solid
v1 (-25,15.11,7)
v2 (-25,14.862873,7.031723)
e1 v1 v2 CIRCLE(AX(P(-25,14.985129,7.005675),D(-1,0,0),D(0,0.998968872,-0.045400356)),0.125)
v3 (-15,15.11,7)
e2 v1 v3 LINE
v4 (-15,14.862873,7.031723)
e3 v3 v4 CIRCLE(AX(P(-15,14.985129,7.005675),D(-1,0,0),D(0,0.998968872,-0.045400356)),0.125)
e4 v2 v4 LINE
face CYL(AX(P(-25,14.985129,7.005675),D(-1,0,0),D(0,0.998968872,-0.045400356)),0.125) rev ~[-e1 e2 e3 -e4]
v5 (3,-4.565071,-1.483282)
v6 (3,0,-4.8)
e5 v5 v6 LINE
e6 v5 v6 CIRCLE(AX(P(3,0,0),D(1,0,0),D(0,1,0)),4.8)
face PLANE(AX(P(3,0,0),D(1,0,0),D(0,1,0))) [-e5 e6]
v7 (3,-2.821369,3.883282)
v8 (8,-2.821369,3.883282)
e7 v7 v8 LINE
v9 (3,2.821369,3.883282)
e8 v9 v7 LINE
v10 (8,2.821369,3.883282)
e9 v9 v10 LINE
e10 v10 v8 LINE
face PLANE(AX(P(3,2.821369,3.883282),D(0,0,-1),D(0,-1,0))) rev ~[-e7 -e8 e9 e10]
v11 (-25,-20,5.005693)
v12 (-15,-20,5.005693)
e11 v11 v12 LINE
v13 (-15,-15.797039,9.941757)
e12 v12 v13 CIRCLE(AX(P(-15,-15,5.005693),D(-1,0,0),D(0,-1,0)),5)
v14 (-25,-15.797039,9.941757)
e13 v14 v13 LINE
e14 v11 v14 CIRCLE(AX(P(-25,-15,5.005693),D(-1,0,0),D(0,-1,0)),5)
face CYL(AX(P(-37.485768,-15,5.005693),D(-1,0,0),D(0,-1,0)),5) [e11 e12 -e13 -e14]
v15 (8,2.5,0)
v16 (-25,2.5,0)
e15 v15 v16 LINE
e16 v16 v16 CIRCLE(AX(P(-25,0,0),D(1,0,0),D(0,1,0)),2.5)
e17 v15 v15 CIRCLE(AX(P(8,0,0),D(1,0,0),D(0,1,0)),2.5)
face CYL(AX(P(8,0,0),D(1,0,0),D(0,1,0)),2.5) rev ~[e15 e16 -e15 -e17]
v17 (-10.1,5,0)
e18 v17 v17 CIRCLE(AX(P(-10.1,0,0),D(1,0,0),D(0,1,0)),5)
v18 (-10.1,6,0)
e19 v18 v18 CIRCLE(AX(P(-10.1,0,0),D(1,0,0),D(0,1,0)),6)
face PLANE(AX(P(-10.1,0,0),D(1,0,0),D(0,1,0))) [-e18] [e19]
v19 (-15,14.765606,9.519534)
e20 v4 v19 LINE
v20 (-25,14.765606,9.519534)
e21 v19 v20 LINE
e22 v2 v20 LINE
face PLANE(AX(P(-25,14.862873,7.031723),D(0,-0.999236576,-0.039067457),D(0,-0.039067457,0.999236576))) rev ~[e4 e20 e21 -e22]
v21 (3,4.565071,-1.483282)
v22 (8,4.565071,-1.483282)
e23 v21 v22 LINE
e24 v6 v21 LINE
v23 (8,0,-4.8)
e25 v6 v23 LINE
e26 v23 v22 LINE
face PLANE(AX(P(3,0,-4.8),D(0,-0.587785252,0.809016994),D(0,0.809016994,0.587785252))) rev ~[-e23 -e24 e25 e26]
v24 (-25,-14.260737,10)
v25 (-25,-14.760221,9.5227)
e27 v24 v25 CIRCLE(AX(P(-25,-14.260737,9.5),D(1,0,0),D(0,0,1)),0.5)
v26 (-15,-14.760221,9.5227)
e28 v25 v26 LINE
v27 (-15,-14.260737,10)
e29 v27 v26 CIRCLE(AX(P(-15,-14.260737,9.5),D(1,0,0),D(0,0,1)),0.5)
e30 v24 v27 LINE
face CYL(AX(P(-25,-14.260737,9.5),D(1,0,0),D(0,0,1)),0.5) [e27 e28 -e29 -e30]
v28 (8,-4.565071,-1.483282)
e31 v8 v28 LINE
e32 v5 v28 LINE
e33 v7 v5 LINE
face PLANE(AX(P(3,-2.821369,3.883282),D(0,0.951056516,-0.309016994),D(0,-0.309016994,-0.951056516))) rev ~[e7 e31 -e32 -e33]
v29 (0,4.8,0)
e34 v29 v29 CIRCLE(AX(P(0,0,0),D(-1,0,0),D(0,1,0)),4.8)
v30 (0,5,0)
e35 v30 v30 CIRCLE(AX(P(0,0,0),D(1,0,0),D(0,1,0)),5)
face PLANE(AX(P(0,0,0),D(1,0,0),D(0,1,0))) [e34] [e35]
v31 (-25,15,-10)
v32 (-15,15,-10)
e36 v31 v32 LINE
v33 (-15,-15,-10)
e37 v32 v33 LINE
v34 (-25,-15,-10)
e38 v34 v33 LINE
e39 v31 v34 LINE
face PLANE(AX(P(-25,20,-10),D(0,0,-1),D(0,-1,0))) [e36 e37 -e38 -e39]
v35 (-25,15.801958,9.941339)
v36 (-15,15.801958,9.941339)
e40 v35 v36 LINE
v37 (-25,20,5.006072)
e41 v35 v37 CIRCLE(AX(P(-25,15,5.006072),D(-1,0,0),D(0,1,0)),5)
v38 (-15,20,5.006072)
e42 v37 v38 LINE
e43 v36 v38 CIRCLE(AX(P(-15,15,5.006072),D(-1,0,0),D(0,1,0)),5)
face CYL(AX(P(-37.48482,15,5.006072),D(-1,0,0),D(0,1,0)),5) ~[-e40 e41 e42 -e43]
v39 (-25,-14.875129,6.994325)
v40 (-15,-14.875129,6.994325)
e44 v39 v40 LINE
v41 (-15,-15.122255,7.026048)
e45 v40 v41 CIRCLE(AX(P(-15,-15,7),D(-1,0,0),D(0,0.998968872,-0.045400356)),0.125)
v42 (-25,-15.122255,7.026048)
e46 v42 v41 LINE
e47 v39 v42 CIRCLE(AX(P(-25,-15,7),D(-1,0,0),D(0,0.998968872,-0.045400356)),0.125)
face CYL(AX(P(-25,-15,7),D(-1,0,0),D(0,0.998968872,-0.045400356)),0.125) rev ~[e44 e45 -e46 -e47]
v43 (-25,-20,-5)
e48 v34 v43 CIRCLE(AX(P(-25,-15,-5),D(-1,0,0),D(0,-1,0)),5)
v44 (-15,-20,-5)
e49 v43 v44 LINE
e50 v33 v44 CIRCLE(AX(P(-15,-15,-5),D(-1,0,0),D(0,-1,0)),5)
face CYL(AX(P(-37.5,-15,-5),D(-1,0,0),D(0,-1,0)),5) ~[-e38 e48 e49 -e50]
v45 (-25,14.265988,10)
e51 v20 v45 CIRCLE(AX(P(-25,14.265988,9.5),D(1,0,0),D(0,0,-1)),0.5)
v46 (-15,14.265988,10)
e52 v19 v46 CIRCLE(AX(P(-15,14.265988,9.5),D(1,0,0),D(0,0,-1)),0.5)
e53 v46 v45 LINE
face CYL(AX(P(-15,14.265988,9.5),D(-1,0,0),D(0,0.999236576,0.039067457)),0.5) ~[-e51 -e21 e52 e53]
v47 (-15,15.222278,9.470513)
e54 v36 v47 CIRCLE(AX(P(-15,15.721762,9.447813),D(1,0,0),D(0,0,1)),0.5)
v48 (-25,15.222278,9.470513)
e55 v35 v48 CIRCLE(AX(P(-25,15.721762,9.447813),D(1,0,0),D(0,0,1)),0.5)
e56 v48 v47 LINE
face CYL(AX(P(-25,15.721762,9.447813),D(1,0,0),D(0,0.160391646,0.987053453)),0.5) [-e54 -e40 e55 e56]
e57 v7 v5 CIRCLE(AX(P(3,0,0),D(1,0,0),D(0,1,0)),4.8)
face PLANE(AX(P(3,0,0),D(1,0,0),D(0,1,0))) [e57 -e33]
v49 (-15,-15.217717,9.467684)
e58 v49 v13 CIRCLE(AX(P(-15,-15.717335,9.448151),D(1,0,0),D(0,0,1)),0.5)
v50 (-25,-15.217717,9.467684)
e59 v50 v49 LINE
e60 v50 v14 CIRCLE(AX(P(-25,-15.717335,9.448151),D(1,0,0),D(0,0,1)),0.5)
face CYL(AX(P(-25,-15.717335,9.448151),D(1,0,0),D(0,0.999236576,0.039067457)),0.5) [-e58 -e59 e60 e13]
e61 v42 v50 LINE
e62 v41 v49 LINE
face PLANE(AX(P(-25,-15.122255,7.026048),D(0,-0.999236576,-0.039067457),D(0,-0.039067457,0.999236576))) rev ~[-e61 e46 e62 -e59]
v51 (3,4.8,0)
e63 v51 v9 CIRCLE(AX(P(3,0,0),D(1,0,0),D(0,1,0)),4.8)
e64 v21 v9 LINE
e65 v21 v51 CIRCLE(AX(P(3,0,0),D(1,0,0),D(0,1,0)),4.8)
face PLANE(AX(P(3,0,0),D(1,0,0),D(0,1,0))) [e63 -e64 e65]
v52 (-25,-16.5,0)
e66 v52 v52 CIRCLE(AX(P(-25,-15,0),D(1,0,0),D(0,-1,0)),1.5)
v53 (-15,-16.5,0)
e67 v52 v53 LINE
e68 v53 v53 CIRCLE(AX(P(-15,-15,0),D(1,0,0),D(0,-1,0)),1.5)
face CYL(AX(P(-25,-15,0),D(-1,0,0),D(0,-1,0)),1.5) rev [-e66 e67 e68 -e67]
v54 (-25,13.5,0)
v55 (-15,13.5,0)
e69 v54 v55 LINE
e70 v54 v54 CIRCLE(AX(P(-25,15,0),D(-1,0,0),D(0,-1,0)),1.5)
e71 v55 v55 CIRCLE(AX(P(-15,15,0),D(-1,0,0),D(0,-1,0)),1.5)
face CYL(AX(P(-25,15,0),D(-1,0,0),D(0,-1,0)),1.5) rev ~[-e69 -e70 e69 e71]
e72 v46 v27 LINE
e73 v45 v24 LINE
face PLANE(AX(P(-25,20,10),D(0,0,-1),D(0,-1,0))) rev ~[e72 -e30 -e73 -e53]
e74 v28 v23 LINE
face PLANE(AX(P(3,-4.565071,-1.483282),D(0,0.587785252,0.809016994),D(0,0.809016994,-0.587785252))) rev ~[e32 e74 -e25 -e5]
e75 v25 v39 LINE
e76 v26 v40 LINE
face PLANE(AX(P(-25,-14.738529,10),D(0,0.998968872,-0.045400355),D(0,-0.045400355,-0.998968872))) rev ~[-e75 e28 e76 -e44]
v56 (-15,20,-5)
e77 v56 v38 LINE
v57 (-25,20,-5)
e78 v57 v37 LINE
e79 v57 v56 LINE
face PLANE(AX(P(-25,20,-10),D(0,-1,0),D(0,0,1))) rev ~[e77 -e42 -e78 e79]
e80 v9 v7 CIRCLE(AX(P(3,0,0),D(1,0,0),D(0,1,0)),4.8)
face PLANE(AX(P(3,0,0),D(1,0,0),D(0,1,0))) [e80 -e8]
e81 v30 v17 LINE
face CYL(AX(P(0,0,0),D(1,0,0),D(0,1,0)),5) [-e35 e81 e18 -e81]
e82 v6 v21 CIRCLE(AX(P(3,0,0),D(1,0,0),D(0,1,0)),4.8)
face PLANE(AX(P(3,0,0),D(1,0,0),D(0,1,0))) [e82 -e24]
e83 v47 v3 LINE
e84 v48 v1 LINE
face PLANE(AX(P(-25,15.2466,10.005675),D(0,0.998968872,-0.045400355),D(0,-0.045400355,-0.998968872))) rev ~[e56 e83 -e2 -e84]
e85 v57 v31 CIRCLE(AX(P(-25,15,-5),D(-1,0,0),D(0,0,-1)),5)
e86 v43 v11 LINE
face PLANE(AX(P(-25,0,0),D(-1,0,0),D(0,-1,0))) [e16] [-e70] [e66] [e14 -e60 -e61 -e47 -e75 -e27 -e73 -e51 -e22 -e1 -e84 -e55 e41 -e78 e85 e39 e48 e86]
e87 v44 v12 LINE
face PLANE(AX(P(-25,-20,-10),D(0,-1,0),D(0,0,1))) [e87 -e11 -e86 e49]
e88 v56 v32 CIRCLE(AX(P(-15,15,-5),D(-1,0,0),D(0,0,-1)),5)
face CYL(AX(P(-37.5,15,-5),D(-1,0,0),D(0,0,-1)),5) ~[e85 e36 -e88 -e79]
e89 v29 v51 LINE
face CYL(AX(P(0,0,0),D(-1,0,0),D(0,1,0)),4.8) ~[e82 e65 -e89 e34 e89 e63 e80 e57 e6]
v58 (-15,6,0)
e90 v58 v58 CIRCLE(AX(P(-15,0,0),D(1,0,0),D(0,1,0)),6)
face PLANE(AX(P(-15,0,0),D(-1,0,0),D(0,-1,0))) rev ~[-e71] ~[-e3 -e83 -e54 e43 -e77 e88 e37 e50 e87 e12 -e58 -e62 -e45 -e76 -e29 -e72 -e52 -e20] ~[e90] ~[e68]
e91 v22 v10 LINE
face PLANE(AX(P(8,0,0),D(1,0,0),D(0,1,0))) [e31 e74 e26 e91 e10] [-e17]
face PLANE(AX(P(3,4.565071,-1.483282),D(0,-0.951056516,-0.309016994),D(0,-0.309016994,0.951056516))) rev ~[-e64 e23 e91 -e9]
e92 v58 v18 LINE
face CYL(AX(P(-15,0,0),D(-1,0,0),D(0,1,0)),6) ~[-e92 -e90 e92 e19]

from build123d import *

# Parameters (mm, degrees)
F0_R          = 5
F1_DEPTH      = 25
F2_R          = 4.8
F3_DEPTH      = 3
F5_DEPTH      = 5
F5_DEPTH_BACK = 23
F6_W          = 40
F6_H          = 20
F6_R          = 1.5
F7_DEPTH      = 10
F9_DEPTH      = 10
F10_T1_DEPTH  = 34.9696394511
F10_T3_DEPTH  = 35
F10_T5_DEPTH  = 34.9715357564
F11_R         = 0.5
F12_R         = 6
F13_DEPTH     = 4.9
F14_R         = 2.5
F15_DEPTH     = 65


# Not quite as in the source:
# - a fillet or chamfer that OpenCascade refuses, or shapes differently, is made with other operations: its cross-section is extruded or revolved along the edge and cut away or added
# - a feature names something its author has since deleted; it is built from what else it names


with BuildPart() as f1:
    # F0 (on Right) → F1 (new body)
    with BuildSketch(Plane.YZ):
        Circle(F0_R)
    extrude(amount=-F1_DEPTH)

    # F2 (on face) → F3 (join)
    with BuildSketch(Plane.YZ):
        Circle(F2_R)
    extrude(amount=F3_DEPTH)

    # F4 (on face) → F5 (join, two sides)
    with BuildSketch(Plane.YZ.offset(3)) as f5_sk:
        Polygon((-4.5650712782, -1.483281573), (0, -4.8), (4.5650712782, -1.483281573), (2.821369211, 3.883281573), (-2.821369211, 3.883281573), align=None)
    extrude(amount=F5_DEPTH)
    extrude(f5_sk.sketch, amount=-F5_DEPTH_BACK)

    # F6 (on face) → F7 (join)
    with BuildSketch(Plane(origin=(-25, 0, 0), x_dir=(0, -1, 0), z_dir=(-1, 0, 0))):
        Rectangle(F6_W, F6_H)
        with Locations((-15, 0)):
            Circle(F6_R, mode=Mode.SUBTRACT)
        with BuildLine():
            ThreePointArc((13.5, 0), (15, 1.5), (16.5, 0))
            ThreePointArc((16.5, 0), (15, -1.5), (13.5, 0))
        make_face(mode=Mode.SUBTRACT)
    extrude(amount=-F7_DEPTH)

    # F8 (on face) → F9 (cut)
    with BuildSketch(Plane(origin=(-25, 0, 0), x_dir=(0, -1, 0), z_dir=(-1, 0, 0))):
        with BuildLine():
            Line((15.0452693954, 10), (14.9885289893, 10))
            Line((14.9885289893, 10), (14.7385289893, 10))
            Line((14.7385289893, 10), (14.8751285557, 6.9943249556))
            ThreePointArc((14.8751285557, 6.9943249556), (15.0159151334, 6.8760173486), (15.1222554927, 7.0260482732))
            Line((15.1222554927, 7.0260482732), (15.2385289893, 10))
            Line((15.2385289893, 10), (15.0452693954, 10))
        make_face()
        with BuildLine():
            Line((-14.9398591969, 10.0056750444), (-14.9965996031, 10.0056750444))
            Line((-14.9965996031, 10.0056750444), (-15.2465996031, 10.0056750444))
            Line((-15.2465996031, 10.0056750444), (-15.1100000367, 7))
            ThreePointArc((-15.1100000367, 7), (-14.9692134589, 6.881692393), (-14.8628730997, 7.0317233176))
            Line((-14.8628730997, 7.0317233176), (-14.7465996031, 10.0056750444))
            Line((-14.7465996031, 10.0056750444), (-14.9398591969, 10.0056750444))
        make_face()
    extrude(amount=-F9_DEPTH, mode=Mode.SUBTRACT)

    # F10: fillet of radius 5 on 4 edges, made by hand

    # F10_s2 → F10_t1 (cut)
    with BuildSketch(Plane.YZ.offset(-37.4848197255)):
        with BuildLine():
            ThreePointArc((20, 5.0060721098), (18.6215817291, 8.4534110516), (15.2463416881, 10))
            Line((15.2463416881, 10), (20, 10))
            Line((20, 10), (20, 5.0060721098))
        make_face()
    extrude(amount=F10_T1_DEPTH, mode=Mode.SUBTRACT)

    # F10_s4 → F10_t3 (cut)
    with BuildSketch(Plane.YZ.offset(-37.5)):
        with BuildLine():
            ThreePointArc((15, -10), (18.5355339059, -8.5355339059), (20, -5))
            Line((20, -5), (20, -10))
            Line((20, -10), (15, -10))
        make_face()
        with BuildLine():
            ThreePointArc((-20, -5), (-18.5355339059, -8.5355339059), (-15, -10))
            Line((-15, -10), (-20, -10))
            Line((-20, -10), (-20, -5))
        make_face()
    extrude(amount=F10_T3_DEPTH, mode=Mode.SUBTRACT)

    # F10_s6 → F10_t5 (cut)
    with BuildSketch(Plane.YZ.offset(-37.4857678782)):
        with BuildLine():
            ThreePointArc((-20, 5.0056928487), (-18.6188841475, 8.4558635006), (-15.2385289893, 10))
            Line((-15.2385289893, 10), (-20, 10))
            Line((-20, 10), (-20, 5.0056928487))
        make_face()
    extrude(amount=F10_T5_DEPTH, mode=Mode.SUBTRACT)

    # F11
    f11_edges = [f1.edges().sort_by_distance(p)[0] for p in [
        (-20, -14.738529, 10),
        (-20, 14.746821, 10),
        (-20, 15.246342, 10),
        (-20, -15.238529, 10),
    ]]
    fillet(f11_edges, radius=F11_R)

    # F12 (on face) → F13 (join)
    with BuildSketch(Plane.YZ.offset(-15)):
        Circle(F12_R)
    extrude(amount=F13_DEPTH)

    # F14 (on face) → F15 (cut)
    with BuildSketch(Plane.YZ.offset(8)):
        Circle(F14_R)
    extrude(amount=-F15_DEPTH, mode=Mode.SUBTRACT)


solid = f1.part
